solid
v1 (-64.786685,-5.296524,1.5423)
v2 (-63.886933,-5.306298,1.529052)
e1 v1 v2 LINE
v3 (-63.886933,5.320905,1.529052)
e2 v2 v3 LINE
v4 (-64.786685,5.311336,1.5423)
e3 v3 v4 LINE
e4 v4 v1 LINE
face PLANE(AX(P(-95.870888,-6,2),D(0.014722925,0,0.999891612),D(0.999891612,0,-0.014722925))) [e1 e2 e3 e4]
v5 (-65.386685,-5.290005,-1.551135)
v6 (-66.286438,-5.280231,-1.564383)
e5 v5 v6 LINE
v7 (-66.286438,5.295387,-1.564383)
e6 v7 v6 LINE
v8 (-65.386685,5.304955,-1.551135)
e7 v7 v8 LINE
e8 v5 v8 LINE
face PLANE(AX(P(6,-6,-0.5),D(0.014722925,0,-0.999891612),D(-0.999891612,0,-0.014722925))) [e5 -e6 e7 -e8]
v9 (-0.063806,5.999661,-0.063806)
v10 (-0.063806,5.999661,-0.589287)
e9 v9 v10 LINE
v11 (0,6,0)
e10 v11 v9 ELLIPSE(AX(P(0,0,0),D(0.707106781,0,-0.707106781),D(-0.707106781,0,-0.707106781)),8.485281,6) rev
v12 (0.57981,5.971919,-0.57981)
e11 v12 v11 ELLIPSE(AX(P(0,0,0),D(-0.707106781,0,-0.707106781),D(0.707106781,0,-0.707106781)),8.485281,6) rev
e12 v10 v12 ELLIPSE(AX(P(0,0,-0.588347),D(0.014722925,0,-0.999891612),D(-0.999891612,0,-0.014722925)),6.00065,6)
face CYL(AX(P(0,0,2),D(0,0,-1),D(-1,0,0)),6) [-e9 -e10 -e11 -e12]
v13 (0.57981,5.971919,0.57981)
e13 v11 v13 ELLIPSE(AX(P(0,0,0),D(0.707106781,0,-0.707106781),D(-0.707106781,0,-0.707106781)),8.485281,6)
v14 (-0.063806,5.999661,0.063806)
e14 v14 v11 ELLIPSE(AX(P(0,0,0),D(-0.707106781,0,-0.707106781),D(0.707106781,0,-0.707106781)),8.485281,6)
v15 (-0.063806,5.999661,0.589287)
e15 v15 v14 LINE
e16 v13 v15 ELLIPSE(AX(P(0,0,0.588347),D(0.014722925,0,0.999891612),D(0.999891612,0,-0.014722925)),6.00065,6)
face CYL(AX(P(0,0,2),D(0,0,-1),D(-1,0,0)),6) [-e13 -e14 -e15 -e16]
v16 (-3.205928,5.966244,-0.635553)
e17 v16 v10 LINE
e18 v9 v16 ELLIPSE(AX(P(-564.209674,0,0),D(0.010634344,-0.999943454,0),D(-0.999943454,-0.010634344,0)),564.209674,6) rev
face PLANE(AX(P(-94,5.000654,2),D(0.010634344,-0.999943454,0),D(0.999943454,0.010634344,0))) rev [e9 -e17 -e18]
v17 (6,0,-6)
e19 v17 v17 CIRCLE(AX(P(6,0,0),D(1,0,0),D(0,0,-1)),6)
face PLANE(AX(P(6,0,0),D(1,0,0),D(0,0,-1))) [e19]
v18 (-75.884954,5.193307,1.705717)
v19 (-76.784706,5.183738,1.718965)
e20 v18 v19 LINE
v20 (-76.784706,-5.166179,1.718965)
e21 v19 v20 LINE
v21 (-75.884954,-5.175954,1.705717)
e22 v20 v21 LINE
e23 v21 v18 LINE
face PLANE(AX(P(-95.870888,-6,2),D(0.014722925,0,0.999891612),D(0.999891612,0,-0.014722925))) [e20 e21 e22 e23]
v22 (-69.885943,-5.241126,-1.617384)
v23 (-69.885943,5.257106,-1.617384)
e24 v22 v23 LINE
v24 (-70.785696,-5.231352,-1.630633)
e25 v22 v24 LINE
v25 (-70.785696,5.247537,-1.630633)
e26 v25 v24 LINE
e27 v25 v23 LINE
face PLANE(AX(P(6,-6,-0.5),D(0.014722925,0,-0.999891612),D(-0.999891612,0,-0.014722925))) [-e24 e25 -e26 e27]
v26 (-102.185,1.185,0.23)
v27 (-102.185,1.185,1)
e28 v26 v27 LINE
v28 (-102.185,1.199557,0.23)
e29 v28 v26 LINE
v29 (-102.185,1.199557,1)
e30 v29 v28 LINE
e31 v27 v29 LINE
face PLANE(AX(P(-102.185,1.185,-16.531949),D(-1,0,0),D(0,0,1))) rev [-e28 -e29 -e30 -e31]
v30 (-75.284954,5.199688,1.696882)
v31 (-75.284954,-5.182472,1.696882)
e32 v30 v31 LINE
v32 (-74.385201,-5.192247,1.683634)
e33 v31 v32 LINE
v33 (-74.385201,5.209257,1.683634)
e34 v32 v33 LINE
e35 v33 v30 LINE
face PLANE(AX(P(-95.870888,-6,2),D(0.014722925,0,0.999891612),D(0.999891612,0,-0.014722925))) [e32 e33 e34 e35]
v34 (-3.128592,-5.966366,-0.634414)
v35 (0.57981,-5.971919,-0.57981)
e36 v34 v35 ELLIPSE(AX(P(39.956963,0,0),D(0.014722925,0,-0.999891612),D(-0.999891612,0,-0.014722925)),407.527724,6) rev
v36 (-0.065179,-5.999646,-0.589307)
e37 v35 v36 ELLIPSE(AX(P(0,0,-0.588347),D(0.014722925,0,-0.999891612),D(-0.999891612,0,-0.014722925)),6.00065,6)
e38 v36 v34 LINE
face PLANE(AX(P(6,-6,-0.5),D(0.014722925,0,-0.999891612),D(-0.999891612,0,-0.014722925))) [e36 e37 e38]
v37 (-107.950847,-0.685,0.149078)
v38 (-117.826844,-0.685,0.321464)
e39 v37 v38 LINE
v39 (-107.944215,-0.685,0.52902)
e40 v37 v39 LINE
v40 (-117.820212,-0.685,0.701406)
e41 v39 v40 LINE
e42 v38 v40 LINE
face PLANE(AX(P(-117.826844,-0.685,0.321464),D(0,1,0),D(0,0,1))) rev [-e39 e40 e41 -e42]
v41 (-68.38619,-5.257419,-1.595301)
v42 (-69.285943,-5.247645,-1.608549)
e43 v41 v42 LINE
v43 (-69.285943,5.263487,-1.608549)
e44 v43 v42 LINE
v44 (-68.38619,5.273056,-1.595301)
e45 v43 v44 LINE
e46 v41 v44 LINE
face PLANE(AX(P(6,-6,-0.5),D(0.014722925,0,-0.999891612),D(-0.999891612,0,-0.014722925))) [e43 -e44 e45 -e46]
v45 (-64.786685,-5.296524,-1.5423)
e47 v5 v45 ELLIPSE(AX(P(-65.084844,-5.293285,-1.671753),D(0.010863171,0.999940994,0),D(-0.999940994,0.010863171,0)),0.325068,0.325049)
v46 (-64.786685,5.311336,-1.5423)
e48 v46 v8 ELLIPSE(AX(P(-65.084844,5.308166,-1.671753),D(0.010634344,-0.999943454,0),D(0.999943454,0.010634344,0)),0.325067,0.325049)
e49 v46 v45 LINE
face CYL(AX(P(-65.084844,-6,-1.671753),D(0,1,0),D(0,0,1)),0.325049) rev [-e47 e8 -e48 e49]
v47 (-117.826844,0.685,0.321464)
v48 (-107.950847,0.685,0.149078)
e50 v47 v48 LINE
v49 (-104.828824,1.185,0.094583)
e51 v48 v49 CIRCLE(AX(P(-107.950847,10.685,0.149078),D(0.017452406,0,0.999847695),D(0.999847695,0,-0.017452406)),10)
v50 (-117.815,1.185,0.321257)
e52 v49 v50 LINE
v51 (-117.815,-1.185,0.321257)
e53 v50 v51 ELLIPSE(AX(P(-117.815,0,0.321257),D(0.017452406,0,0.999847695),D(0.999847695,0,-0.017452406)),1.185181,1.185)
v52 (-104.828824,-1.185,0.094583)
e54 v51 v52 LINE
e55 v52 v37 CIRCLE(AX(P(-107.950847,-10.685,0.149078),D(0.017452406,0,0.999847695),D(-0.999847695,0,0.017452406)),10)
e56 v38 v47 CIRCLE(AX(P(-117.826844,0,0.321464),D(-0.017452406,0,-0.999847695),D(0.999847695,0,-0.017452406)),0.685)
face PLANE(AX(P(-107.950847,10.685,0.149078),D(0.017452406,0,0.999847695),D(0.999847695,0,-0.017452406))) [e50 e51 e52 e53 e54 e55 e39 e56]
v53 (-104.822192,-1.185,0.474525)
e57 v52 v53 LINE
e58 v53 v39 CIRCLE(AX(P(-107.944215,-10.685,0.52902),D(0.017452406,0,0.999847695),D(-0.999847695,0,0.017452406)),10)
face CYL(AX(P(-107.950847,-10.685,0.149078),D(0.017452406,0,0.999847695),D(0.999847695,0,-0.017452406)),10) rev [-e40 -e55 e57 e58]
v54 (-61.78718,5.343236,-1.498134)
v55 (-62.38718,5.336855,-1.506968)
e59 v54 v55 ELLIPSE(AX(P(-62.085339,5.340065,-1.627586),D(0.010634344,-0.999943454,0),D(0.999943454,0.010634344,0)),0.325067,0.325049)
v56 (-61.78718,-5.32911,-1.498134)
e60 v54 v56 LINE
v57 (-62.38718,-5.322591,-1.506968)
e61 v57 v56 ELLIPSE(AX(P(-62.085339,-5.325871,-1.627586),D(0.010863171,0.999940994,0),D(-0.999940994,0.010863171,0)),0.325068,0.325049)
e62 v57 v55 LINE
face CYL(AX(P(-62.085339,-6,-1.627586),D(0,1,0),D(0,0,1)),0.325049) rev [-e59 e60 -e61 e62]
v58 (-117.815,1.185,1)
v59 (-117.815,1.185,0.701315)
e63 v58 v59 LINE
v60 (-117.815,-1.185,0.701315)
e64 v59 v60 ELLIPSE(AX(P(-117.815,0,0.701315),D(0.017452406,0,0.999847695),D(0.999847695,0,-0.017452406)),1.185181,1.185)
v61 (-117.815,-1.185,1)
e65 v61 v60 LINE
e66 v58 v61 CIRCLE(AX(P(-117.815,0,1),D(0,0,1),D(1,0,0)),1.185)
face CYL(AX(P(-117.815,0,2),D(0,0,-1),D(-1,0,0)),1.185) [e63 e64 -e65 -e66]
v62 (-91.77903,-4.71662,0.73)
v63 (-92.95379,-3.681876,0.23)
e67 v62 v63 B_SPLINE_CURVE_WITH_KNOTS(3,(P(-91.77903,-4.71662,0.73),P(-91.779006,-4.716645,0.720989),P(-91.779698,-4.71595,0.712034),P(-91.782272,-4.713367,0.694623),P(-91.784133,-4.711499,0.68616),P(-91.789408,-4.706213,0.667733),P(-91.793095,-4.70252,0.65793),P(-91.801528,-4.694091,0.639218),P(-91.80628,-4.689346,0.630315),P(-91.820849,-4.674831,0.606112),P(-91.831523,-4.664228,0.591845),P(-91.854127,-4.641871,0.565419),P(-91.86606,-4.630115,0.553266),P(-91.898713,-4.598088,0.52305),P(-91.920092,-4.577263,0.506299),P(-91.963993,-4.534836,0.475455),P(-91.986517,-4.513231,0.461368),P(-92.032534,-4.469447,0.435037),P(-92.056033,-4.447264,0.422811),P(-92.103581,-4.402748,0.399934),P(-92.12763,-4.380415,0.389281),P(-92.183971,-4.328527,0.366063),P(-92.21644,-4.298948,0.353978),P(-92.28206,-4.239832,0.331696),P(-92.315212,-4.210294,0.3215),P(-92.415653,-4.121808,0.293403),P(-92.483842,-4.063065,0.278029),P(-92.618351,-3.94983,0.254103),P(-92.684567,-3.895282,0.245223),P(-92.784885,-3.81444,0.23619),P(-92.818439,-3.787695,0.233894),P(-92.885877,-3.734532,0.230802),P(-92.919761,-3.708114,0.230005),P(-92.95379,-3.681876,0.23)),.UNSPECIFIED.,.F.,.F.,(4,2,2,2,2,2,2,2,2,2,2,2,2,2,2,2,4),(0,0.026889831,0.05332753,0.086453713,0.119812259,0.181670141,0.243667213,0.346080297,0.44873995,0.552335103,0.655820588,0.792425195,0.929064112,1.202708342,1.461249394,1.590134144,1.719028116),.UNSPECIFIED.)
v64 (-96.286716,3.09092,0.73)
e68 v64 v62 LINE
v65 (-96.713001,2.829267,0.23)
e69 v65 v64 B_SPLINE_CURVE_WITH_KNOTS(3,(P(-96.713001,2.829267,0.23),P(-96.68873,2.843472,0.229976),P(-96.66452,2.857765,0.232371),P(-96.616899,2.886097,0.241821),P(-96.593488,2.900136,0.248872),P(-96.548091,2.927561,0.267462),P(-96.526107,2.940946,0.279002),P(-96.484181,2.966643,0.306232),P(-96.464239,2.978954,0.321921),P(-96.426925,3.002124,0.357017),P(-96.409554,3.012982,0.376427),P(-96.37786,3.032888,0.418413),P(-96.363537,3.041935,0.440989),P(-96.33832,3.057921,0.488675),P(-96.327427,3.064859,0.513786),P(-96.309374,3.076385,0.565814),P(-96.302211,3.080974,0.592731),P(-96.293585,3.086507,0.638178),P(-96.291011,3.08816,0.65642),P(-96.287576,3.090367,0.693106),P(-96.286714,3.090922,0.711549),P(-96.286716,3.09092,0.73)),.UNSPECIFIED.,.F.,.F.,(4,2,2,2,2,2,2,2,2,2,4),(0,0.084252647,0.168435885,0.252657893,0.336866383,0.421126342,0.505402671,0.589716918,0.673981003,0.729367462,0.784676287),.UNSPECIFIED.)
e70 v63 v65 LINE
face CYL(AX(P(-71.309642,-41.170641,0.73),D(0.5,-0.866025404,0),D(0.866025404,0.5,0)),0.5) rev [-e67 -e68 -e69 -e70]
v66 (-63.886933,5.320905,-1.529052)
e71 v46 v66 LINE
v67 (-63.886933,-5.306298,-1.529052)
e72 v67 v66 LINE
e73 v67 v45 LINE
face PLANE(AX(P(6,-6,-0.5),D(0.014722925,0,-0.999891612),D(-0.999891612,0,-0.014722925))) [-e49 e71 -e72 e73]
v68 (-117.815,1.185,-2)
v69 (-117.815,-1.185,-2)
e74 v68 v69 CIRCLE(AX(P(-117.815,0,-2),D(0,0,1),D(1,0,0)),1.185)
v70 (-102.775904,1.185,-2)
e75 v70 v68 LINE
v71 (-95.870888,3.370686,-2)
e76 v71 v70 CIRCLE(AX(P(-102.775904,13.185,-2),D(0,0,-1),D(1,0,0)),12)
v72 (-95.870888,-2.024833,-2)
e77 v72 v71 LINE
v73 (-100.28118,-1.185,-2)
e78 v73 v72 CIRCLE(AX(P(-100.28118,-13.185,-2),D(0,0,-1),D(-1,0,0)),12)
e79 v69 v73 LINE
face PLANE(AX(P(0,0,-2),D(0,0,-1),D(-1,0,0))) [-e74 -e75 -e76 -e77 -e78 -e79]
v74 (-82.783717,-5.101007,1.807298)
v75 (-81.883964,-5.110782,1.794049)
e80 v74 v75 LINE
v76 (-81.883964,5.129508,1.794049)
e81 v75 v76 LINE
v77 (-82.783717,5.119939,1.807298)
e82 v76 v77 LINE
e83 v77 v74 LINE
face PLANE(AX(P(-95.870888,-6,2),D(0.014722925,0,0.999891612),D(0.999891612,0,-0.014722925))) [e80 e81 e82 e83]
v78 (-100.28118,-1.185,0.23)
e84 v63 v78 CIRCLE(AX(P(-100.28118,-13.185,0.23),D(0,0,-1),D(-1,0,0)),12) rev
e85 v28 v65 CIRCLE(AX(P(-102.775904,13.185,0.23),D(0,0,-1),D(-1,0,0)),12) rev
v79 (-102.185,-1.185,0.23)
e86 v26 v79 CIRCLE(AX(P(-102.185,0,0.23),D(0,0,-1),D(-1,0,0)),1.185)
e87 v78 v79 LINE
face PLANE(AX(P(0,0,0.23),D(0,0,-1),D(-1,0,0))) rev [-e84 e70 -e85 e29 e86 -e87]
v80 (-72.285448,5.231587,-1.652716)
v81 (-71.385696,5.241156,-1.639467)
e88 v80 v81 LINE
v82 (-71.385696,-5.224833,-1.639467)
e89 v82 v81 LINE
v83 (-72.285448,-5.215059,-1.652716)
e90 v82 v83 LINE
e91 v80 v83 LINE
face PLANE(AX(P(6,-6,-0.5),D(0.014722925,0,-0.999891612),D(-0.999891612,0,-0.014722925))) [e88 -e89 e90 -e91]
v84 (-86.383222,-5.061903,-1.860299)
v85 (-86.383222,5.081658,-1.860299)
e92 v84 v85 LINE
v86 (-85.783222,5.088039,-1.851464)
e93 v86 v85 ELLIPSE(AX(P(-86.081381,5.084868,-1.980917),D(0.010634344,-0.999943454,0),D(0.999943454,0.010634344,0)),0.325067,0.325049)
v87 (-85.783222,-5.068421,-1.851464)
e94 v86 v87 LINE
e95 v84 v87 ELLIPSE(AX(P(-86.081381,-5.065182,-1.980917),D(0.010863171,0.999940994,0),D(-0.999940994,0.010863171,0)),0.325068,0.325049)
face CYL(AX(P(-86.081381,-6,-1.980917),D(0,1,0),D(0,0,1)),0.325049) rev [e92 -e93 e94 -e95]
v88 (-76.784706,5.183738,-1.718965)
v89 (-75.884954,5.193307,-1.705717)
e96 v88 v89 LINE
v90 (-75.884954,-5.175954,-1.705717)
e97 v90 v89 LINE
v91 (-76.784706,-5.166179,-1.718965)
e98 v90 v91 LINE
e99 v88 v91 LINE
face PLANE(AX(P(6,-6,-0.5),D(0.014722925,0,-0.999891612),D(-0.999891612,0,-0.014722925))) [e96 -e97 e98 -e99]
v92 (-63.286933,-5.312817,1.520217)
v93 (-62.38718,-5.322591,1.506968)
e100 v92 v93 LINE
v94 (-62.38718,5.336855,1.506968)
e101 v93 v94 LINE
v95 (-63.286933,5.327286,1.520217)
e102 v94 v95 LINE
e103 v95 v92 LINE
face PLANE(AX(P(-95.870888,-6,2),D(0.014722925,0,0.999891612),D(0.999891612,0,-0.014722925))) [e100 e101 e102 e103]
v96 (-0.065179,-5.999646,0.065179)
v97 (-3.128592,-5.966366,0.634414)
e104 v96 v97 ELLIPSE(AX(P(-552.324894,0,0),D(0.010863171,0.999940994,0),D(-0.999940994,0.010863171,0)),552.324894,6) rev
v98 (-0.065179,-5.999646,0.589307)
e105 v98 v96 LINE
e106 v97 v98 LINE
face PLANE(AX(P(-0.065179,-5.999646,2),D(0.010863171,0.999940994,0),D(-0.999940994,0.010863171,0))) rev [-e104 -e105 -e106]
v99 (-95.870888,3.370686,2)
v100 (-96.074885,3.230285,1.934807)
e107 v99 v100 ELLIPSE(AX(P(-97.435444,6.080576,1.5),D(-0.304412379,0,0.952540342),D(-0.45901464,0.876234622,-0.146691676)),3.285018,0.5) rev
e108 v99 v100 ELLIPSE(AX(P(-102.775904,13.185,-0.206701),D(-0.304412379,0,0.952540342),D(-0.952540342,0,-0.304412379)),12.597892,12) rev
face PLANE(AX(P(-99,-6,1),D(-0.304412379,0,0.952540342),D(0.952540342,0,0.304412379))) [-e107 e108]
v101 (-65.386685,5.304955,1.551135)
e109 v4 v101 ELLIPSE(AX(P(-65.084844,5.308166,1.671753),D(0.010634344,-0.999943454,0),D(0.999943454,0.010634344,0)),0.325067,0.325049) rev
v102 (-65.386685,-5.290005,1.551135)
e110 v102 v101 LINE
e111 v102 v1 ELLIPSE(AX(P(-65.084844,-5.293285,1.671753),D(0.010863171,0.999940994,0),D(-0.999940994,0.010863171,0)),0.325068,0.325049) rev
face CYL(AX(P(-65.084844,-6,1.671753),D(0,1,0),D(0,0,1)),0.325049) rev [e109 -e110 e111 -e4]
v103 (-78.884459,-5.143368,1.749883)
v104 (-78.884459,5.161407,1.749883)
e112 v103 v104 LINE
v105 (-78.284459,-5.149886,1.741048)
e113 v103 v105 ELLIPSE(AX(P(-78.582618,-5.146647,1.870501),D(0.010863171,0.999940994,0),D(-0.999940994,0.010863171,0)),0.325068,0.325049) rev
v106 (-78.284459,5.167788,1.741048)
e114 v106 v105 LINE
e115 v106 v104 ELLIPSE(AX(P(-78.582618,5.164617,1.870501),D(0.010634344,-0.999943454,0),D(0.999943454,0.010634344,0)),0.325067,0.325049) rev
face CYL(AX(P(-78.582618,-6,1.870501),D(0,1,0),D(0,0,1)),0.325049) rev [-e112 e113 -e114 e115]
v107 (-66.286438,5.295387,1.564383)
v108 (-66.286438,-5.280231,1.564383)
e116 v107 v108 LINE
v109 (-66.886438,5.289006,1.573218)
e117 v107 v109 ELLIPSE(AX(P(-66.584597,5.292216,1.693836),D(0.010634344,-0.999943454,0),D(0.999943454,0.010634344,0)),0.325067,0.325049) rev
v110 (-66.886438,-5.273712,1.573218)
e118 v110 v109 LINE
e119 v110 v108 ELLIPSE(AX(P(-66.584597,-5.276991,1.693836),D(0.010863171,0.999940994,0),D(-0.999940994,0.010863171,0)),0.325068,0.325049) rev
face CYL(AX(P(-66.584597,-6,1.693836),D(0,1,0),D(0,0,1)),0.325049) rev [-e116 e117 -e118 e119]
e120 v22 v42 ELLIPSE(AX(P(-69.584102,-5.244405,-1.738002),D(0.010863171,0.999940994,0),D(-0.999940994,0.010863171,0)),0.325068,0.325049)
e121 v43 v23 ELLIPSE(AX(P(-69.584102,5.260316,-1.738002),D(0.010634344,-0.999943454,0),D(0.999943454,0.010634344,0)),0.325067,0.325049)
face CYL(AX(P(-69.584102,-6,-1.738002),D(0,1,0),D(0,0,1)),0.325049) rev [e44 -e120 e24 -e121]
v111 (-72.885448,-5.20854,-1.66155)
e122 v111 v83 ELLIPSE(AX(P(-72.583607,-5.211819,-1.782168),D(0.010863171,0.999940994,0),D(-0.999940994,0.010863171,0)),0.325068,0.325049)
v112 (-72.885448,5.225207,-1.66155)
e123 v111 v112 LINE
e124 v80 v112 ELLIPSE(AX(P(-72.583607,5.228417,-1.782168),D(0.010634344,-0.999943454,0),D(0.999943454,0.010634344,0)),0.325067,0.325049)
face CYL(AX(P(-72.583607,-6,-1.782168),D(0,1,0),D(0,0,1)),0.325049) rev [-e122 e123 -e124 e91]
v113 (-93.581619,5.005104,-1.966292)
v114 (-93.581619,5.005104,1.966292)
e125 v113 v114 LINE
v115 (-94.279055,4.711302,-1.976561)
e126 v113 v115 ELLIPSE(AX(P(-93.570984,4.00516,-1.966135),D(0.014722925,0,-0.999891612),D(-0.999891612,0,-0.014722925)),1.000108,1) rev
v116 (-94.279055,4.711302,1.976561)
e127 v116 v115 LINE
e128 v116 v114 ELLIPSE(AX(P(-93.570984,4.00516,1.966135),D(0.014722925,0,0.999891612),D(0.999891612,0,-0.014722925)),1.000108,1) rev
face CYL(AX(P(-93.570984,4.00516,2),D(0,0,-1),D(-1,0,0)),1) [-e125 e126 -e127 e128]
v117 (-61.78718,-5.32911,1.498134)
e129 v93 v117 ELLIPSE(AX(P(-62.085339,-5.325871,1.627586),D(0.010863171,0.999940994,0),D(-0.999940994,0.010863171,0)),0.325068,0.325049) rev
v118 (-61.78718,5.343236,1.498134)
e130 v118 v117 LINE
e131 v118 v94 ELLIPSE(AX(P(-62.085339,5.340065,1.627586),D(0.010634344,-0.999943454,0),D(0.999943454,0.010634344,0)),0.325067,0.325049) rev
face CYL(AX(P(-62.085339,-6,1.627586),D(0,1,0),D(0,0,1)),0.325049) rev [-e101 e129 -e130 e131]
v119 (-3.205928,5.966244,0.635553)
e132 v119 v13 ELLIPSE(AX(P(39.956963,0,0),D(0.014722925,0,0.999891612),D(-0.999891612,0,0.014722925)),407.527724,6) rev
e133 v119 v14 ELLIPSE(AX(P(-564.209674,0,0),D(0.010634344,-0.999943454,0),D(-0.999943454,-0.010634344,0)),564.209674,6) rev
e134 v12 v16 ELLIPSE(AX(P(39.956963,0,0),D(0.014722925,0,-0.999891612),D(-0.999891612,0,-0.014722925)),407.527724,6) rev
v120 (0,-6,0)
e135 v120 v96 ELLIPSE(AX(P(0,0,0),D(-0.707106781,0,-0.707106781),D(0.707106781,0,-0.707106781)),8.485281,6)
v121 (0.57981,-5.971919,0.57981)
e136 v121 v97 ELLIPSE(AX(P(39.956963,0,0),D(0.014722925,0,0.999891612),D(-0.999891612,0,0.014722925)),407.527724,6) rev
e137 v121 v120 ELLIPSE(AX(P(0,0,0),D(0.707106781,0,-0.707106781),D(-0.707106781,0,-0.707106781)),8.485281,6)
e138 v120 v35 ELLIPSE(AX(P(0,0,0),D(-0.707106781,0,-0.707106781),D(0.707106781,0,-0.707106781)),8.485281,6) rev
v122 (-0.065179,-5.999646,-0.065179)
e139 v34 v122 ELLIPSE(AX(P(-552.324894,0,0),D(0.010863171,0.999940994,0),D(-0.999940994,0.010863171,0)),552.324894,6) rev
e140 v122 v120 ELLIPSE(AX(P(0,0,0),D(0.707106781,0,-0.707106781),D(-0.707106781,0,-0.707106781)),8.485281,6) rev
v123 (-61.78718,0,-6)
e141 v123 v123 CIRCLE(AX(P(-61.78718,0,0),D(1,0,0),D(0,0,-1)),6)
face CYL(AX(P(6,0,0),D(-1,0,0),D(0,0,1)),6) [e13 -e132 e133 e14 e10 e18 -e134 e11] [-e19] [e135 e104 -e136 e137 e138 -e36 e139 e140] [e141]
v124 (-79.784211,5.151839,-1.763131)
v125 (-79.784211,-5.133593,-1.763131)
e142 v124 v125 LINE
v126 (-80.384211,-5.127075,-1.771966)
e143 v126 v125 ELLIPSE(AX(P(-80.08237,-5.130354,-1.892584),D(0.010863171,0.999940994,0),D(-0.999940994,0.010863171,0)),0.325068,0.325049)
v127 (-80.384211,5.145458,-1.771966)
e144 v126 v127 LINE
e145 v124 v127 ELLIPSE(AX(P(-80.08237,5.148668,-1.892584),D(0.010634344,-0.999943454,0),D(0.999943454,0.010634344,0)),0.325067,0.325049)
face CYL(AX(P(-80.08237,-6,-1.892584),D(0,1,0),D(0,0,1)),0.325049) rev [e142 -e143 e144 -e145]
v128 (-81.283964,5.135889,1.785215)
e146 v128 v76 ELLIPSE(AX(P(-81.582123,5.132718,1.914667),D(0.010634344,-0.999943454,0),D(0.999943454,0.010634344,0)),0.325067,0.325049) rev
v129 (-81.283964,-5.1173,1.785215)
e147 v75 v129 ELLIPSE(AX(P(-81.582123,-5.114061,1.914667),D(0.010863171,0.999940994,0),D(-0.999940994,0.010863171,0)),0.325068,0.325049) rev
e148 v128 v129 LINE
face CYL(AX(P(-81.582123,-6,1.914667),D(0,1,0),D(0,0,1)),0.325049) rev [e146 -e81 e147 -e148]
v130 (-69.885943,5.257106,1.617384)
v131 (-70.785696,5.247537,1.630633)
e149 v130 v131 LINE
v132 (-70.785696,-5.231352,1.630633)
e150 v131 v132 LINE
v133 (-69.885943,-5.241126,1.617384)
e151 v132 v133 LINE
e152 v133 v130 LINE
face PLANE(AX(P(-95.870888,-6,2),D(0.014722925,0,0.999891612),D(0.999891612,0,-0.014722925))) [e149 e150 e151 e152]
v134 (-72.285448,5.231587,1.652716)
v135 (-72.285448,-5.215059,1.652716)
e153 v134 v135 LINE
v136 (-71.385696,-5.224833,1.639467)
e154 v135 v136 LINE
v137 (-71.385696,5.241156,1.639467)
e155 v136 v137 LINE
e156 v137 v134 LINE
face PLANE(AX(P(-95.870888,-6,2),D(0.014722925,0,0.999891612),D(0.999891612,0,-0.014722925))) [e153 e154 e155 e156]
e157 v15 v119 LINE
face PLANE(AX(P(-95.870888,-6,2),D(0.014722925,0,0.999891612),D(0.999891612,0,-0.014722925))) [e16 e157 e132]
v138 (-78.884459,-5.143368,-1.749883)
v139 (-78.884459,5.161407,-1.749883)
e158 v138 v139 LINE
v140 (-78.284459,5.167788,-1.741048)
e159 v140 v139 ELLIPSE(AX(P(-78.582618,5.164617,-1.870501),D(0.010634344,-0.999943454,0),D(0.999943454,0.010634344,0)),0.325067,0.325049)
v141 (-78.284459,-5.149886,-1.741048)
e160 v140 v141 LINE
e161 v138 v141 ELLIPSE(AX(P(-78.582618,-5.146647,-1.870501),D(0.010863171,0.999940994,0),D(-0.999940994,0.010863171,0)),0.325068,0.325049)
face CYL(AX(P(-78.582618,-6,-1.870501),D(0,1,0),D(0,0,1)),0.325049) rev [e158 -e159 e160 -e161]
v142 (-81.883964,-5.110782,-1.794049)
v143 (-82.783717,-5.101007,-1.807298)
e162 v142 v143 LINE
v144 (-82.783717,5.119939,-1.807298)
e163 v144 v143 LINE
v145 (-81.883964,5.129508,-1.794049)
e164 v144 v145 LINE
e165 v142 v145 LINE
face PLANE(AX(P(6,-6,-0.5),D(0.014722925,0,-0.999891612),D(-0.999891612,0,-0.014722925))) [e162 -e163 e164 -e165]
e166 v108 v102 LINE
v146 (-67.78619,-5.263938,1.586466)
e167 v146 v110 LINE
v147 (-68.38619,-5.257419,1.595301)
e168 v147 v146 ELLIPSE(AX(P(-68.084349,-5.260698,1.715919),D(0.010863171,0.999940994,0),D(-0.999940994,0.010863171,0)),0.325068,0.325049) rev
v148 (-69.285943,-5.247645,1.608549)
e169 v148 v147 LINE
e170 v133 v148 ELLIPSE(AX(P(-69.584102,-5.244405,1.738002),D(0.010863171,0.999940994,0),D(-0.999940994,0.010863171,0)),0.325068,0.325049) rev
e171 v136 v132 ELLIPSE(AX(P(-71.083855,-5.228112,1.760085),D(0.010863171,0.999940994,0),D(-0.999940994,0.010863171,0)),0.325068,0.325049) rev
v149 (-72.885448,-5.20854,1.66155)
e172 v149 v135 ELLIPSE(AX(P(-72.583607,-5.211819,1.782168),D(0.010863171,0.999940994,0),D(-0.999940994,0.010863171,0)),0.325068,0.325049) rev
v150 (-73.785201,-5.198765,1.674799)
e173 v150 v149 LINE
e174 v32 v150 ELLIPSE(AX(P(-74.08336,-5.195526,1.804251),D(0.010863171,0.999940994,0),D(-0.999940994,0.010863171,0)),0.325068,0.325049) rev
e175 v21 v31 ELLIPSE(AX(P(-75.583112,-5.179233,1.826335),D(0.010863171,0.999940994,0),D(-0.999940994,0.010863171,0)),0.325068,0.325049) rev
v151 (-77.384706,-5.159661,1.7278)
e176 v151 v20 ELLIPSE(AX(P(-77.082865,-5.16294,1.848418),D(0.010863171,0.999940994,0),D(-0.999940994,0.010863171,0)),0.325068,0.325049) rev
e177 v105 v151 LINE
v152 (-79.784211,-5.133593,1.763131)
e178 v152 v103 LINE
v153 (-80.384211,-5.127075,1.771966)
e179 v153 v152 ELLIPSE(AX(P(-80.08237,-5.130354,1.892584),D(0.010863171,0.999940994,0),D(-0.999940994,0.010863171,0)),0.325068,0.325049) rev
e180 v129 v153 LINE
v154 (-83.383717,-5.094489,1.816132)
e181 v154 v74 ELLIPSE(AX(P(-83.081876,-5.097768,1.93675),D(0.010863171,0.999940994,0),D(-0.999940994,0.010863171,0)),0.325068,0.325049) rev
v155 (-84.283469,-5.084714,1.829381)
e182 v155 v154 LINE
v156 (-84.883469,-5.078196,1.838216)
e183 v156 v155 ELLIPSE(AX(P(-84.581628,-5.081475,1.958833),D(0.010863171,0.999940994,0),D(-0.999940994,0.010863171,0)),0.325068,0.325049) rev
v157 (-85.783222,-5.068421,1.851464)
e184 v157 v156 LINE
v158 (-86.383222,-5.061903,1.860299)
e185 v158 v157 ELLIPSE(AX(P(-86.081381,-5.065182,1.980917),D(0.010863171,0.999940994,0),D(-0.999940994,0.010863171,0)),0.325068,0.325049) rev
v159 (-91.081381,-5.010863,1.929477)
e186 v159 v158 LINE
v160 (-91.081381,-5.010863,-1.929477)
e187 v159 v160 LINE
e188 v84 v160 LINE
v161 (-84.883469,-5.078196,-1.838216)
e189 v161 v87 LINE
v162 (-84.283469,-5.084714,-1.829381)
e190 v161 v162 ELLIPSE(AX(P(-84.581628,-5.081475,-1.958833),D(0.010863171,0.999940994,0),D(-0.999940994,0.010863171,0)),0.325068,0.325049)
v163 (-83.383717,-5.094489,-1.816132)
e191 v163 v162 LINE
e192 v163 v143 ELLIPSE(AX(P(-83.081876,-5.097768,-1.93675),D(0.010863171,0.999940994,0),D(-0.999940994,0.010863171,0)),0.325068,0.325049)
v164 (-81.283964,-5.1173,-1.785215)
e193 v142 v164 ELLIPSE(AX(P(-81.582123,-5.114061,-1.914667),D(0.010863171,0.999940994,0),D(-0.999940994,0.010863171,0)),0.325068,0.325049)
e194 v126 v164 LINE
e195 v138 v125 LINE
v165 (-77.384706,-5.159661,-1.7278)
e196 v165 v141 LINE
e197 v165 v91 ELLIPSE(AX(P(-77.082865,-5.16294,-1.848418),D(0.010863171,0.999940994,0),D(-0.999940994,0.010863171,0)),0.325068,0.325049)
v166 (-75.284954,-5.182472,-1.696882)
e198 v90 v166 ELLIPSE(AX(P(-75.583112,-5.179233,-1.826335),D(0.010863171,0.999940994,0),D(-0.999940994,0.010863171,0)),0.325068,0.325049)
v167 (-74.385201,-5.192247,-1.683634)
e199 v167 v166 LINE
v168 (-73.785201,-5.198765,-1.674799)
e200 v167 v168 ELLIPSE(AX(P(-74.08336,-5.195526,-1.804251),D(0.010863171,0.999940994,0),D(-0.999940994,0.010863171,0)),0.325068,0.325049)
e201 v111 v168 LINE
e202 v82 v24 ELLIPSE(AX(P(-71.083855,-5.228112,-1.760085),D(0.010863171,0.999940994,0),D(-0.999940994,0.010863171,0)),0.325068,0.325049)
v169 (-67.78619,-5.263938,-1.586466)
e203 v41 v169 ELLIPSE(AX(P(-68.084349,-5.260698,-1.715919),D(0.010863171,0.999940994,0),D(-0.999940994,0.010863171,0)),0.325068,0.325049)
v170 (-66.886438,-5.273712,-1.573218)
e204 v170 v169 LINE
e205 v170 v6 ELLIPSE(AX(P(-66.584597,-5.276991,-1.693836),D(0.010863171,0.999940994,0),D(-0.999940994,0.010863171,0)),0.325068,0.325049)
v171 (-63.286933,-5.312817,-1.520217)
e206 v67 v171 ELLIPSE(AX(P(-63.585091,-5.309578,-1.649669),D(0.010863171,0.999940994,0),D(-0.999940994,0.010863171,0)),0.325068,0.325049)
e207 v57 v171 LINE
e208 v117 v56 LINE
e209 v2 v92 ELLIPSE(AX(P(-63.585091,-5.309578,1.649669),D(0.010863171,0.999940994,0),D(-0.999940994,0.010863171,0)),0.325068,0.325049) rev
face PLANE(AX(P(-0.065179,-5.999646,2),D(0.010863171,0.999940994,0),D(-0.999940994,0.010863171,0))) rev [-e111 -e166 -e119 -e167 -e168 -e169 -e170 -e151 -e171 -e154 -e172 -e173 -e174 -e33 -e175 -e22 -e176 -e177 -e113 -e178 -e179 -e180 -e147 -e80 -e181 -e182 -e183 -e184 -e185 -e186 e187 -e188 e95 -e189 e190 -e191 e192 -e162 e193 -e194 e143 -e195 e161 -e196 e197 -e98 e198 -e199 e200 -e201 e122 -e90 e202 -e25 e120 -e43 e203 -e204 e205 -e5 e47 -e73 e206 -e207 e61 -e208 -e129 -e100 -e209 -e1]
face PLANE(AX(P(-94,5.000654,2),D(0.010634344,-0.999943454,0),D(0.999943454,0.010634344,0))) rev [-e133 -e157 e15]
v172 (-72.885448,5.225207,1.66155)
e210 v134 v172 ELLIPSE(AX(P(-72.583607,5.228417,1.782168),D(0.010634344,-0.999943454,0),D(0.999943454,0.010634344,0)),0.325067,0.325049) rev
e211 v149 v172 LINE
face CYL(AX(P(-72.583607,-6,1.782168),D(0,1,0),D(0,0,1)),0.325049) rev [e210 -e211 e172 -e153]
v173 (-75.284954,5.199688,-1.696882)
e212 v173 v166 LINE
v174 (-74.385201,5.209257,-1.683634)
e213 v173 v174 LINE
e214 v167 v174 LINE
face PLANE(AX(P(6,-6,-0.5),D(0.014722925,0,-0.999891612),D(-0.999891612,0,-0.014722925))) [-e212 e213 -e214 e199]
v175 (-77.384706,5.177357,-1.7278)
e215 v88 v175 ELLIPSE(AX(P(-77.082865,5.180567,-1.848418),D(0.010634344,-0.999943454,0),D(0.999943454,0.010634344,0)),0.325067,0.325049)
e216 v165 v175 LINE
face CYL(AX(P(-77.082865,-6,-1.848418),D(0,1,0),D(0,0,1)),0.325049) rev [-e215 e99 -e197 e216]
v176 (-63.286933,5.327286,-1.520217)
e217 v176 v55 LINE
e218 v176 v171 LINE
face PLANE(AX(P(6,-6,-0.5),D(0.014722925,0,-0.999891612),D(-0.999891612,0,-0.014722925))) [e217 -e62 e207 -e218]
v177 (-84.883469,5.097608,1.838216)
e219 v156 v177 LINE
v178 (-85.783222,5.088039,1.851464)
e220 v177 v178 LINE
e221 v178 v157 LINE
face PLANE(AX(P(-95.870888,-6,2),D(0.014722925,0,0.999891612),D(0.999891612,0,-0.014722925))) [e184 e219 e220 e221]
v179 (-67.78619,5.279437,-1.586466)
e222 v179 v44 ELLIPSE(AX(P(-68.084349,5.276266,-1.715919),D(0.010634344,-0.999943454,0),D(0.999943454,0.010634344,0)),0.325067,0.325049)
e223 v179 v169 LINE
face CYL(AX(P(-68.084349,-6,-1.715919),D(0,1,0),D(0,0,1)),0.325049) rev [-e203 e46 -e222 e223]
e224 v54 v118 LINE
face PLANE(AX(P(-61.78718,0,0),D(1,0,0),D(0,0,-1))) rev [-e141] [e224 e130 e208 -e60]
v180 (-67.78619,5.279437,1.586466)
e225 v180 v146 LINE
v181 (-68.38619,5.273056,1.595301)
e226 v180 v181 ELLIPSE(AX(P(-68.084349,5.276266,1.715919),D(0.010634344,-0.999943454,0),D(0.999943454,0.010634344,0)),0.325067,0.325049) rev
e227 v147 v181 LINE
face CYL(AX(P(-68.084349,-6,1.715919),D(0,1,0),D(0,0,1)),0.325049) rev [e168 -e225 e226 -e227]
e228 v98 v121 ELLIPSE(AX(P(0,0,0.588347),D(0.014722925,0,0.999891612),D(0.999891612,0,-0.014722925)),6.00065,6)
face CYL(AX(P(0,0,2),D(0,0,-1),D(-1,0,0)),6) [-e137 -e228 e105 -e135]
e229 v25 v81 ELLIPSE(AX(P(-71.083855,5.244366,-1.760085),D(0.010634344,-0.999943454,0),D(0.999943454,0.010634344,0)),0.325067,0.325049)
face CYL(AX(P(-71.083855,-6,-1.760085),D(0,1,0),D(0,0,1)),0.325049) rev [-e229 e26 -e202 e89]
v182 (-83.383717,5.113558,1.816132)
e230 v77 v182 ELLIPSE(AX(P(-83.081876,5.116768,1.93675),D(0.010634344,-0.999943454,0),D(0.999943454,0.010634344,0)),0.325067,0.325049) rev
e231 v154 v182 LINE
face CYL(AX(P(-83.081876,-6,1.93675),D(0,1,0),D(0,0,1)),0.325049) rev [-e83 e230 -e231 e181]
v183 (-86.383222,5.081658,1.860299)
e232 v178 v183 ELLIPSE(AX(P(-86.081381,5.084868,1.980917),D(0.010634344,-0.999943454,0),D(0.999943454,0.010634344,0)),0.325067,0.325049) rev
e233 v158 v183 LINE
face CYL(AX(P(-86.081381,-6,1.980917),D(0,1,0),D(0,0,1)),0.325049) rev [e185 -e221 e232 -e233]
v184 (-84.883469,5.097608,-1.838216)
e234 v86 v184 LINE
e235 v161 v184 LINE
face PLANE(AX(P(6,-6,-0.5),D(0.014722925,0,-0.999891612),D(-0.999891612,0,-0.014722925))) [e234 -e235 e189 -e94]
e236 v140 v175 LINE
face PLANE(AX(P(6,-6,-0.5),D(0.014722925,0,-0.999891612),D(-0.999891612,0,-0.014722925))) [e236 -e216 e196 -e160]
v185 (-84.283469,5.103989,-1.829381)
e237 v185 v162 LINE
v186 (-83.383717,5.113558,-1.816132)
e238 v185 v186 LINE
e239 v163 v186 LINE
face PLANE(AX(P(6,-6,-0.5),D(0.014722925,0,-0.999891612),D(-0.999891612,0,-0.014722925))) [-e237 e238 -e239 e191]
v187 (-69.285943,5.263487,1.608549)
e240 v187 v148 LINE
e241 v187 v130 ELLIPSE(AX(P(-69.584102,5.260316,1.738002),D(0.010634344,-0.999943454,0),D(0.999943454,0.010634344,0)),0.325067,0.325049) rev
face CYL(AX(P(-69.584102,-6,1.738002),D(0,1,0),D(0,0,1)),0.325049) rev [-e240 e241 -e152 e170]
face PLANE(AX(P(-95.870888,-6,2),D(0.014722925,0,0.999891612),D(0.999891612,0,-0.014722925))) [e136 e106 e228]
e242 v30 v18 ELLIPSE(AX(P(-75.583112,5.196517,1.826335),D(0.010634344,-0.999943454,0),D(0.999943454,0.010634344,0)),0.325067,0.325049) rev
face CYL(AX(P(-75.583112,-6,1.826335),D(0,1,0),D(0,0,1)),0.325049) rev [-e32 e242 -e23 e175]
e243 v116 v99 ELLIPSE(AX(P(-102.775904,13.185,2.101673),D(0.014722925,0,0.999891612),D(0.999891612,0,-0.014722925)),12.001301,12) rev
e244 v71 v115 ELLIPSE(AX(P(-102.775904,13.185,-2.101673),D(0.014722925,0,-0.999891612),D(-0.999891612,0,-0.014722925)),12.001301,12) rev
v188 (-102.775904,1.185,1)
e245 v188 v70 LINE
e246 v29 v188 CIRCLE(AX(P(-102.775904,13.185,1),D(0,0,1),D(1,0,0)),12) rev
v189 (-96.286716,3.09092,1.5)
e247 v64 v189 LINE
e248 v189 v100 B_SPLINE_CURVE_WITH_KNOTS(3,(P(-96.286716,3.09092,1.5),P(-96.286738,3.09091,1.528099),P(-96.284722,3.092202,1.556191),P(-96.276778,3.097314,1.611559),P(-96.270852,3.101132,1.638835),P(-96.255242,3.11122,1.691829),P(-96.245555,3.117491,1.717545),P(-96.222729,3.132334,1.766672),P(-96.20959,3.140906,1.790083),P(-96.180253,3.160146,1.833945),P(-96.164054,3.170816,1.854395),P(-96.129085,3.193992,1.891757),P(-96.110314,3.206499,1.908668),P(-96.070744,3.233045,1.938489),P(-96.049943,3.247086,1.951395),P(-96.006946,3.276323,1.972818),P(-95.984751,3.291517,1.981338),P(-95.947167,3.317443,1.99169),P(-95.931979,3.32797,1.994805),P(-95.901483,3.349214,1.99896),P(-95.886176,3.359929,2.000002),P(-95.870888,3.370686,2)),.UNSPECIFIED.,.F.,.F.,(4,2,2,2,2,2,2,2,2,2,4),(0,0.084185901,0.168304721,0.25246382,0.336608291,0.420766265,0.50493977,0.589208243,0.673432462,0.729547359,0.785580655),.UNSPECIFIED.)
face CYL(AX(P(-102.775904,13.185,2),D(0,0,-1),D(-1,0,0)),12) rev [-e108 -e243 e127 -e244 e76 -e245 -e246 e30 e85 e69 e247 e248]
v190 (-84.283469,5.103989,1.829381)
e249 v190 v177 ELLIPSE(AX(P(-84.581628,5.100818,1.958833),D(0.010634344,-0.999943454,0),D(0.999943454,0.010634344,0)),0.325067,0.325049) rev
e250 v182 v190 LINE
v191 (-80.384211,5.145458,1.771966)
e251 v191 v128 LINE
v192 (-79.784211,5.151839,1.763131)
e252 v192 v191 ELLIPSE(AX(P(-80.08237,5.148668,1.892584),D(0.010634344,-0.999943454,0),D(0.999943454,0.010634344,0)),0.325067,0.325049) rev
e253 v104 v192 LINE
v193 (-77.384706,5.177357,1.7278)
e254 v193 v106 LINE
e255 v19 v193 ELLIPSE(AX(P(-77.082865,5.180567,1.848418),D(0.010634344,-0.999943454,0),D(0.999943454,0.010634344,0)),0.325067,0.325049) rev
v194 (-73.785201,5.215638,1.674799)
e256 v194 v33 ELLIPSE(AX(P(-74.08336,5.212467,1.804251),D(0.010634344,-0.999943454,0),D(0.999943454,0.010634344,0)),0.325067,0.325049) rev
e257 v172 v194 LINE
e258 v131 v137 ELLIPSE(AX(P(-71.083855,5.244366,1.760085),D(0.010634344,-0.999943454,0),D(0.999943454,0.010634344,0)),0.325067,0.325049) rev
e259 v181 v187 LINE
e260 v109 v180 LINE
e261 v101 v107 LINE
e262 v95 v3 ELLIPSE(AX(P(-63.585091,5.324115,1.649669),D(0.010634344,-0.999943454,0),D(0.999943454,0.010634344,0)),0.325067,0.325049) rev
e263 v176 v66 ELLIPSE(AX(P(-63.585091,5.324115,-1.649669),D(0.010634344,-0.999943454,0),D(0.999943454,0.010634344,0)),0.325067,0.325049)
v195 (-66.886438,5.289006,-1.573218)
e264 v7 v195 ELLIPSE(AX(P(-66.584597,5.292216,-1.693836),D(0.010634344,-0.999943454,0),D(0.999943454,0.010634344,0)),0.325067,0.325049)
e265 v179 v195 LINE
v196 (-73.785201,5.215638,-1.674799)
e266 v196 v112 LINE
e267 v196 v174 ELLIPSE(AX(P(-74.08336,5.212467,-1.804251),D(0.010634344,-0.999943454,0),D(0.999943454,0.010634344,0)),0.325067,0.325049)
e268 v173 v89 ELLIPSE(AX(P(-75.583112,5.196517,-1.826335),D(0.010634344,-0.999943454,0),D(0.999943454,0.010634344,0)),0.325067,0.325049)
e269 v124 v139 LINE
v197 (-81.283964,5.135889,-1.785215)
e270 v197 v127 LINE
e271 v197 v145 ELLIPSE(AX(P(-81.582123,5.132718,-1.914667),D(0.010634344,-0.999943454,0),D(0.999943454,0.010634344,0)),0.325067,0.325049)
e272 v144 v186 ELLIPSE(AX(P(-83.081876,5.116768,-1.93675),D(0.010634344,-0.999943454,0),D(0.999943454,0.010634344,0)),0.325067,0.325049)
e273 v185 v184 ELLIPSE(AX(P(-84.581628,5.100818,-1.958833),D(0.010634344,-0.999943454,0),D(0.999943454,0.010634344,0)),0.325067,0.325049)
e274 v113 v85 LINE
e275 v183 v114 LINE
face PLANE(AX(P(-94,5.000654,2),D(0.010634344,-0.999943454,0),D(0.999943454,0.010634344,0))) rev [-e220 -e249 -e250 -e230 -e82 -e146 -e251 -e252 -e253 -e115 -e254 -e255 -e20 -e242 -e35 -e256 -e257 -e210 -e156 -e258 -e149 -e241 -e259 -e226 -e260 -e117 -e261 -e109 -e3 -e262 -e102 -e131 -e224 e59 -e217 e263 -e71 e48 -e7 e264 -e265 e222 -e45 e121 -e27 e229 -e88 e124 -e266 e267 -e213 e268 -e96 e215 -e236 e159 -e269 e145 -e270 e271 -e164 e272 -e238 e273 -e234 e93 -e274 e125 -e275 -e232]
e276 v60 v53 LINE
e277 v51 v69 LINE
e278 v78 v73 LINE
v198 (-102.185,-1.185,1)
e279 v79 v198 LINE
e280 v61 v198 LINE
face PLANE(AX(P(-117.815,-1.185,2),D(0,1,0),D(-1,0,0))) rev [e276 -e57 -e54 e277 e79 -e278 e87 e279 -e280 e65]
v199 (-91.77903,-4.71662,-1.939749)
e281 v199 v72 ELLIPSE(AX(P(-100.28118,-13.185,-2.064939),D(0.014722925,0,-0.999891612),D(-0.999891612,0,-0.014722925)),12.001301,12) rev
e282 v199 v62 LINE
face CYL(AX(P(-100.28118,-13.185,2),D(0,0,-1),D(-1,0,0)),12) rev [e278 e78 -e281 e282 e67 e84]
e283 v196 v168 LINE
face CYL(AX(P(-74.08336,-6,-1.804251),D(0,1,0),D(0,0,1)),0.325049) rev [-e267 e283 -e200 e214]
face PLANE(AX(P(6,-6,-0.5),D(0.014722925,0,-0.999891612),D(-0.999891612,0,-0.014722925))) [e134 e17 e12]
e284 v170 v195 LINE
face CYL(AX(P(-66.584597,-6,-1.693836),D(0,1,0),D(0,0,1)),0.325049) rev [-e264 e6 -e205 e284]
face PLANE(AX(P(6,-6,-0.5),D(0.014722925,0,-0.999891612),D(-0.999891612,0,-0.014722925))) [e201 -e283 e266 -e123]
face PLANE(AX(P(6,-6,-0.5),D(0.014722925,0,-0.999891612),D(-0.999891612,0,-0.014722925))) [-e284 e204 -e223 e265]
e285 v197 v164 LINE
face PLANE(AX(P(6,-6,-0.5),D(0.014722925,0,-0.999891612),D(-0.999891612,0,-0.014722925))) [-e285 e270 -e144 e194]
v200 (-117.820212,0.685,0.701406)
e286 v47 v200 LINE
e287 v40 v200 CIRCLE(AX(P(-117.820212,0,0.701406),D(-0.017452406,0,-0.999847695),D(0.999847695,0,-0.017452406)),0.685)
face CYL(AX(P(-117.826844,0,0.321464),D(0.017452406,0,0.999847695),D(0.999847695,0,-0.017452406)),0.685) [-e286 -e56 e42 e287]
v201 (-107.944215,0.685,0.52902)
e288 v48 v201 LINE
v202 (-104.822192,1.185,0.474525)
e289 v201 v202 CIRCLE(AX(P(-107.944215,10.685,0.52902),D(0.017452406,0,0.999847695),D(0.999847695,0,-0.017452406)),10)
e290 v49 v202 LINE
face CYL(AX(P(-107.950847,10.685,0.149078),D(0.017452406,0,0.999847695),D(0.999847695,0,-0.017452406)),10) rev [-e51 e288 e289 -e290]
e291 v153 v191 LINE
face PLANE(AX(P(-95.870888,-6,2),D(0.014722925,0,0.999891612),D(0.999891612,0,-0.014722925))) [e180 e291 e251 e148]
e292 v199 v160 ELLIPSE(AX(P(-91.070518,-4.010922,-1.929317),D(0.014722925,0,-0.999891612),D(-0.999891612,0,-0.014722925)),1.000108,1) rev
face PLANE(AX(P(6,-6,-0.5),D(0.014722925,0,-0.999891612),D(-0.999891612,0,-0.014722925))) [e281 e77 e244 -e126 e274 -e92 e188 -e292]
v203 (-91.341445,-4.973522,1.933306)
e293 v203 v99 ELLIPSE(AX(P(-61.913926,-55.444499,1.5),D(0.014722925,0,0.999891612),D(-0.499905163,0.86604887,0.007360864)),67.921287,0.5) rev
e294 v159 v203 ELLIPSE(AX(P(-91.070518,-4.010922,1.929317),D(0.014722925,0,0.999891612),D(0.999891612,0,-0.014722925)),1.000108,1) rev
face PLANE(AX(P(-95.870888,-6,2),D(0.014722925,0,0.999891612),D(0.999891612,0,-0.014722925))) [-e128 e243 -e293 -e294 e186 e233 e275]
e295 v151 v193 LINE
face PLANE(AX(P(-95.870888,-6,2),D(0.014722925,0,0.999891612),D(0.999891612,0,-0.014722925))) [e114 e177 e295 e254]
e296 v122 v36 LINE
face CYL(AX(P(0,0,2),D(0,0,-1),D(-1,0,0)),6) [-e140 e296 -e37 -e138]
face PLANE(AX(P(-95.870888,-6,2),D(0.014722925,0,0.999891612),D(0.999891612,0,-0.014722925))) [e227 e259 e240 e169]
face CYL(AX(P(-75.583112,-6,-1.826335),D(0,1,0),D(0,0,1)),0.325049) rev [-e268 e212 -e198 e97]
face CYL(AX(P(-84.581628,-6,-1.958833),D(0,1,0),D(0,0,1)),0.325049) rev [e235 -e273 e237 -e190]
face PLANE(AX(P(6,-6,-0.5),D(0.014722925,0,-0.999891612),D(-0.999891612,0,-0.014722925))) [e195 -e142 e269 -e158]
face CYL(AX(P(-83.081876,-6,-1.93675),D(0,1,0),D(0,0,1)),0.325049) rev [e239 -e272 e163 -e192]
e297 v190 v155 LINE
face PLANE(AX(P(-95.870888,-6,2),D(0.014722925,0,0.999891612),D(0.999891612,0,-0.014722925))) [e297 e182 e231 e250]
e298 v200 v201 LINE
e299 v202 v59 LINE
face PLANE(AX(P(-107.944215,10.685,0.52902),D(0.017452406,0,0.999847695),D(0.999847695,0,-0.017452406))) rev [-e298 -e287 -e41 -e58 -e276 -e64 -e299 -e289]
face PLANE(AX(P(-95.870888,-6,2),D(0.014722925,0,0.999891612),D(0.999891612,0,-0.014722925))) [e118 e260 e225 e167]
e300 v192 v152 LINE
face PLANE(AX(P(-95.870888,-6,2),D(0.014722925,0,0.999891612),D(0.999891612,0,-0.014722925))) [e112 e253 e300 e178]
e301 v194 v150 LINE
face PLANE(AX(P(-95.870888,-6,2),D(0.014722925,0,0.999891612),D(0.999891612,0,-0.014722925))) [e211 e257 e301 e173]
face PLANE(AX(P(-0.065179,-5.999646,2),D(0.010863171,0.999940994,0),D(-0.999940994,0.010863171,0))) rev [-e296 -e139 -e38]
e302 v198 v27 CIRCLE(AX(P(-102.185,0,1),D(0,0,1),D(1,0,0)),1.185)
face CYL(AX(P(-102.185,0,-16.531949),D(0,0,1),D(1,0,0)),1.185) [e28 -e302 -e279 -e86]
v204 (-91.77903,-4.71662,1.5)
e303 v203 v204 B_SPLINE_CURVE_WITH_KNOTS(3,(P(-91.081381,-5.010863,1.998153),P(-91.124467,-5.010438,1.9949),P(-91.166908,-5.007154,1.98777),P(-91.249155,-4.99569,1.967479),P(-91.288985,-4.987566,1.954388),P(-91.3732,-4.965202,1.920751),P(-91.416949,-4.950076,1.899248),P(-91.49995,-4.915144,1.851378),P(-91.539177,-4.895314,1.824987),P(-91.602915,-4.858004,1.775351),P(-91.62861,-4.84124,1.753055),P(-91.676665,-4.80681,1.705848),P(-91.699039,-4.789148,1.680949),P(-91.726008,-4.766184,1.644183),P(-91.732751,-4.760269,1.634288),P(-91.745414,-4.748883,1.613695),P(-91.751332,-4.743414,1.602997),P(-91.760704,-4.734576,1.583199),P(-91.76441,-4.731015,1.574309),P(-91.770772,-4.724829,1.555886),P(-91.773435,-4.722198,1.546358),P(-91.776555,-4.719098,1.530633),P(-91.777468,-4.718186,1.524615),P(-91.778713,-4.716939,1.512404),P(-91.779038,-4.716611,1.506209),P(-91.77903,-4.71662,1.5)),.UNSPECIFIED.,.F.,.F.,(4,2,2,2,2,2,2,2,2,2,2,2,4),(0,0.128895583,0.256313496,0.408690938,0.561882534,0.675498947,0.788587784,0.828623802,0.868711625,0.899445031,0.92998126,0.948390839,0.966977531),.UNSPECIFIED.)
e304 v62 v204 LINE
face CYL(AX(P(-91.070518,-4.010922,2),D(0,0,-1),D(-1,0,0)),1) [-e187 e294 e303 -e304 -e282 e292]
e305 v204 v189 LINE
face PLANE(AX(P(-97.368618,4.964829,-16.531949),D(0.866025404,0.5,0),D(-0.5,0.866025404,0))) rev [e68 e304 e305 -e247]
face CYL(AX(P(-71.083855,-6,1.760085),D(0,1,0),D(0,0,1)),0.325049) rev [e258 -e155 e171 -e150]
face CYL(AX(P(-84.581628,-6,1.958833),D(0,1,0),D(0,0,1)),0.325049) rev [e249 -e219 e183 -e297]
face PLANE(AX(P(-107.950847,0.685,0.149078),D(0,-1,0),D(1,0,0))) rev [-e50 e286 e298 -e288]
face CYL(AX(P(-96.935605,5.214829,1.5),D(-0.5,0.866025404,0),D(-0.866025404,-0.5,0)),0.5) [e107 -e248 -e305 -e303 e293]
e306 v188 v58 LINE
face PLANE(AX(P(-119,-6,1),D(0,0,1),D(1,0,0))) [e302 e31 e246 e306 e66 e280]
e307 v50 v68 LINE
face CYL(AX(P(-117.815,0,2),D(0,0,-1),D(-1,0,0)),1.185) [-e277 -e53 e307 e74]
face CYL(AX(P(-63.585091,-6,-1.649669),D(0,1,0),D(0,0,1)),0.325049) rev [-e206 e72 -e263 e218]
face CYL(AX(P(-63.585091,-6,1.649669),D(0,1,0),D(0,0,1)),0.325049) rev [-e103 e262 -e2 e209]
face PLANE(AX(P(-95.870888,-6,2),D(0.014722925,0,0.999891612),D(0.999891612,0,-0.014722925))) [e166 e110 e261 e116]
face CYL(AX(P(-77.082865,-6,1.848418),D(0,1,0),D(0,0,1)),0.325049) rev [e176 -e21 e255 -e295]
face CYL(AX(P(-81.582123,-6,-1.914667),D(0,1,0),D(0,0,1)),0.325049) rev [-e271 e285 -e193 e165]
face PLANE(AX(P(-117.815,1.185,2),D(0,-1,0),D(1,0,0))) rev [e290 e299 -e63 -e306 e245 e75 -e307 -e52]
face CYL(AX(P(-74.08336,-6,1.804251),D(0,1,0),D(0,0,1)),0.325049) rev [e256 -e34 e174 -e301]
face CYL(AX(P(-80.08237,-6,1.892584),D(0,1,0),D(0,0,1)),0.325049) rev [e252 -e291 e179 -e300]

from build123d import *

# Parameters (mm, degrees)
BOSS_EXTRU_1_DEPTH           = 2
CONG_2_R                     = 1
ENL_V_MAT_EXTRU_1_DEPTH      = 1.77
CONG_1_R                     = 0.5
ENL_V_MAT_EXTRU_2_DEPTH      = 120.16794871273063
ENL_V_MAT_EXTRU_2_DEPTH_BACK = 120.16794871273063
ESQUISSE4_OUTSIDE_W          = 152.128
ESQUISSE4_OUTSIDE_H          = 31.128000000000004
ENL_V_MAT_EXTRU_3_DEPTH      = 120.16794871273063
R_P_TITION_START             = -5.329109723
R_P_TITION_LIN_AIRE1_DEPTH   = 10.672345711
ENL_V_MAT_EXTRU_5_DEPTH      = 0.19
BOSS_EXTRU_2_DEPTH           = 6
BOSS_EXTRU_2_DEPTH_BACK      = 61.78718
ESQUISSE9_R                  = 6


# Read off the part's stored shape, not the designer's step: Répétition linéaire1
with BuildPart() as part:
    # Esquisse1 → Boss.-Extru.1 (new, symmetric)
    with BuildSketch(Plane.XY):
        with BuildLine():
            Line((-94, 5.000654392557492), (-0.06380606653039397, 5.999660722563728))
            ThreePointArc((-0.06380606653039397, 5.999660722563728), (5.999999960724106, -0.0006865206484478), (-0.06517902850728707, -5.9996459640751185))
            Line((-0.06517902850728707, -5.9996459640751185), (-91.5, -5.0063152178369394))
            ThreePointArc((-91.5, -5.0063152178369394), (-95.49287183308192, -2.181722820314924), (-100.28117960378982, -1.1850000000000003))
            Line((-100.28117960378982, -1.1850000000000003), (-117.815, -1.185))
            ThreePointArc((-117.815, -1.185), (-119, 1.5e-16), (-117.815, 1.185))
            Line((-117.815, 1.185), (-102.77590376986532, 1.1850000000000003))
            ThreePointArc((-102.77590376986532, 1.1850000000000003), (-97.99114396864803, 2.1801795269229824), (-94, 5.000654392557492))
        make_face()
    extrude(amount=BOSS_EXTRU_1_DEPTH, both=True)

    # Congé2
    cong_2_edges = [part.edges().sort_by_distance(p)[0] for p in [
        (-91.5, -5.006315217836939, 0),
        (-94, 5.000654392557493, 0),
    ]]
    fillet(cong_2_edges, radius=CONG_2_R)

    # Esquisse3 → Enlèv. mat.-Extru.1 (cut)
    with BuildSketch(Plane.XY.offset(2)):
        with BuildLine():
            Line((-97.36861768988254, 4.964829326045353), (-91.6124802044987, -5.005093253991168))
            Line((-91.6124802044987, -5.005093253991168), (-102.18500000000003, -5.00509325399117))
            Line((-102.18500000000003, -5.00509325399117), (-102.18500000000003, -1.185))
            ThreePointArc((-102.18500000000003, -1.185), (-101.00000000000003, 0), (-102.18500000000003, 1.185))
            Line((-102.18500000000003, 1.185), (-102.18500000000003, 4.964829326045353))
            Line((-102.18500000000003, 4.964829326045353), (-97.36861768988254, 4.964829326045353))
        make_face()
    extrude(amount=-ENL_V_MAT_EXTRU_1_DEPTH, mode=Mode.SUBTRACT)

    # Congé1
    cong_1_edges = [part.edges().sort_by_distance(p)[0] for p in [
        (-94.03287302320349, -0.8128499177196291, 0.22999999999999998),
        (-94.03287302320348, -0.8128499177196522, 2),
    ]]
    fillet(cong_1_edges, radius=CONG_1_R)

    # Esquisse4 outside → Enlèv. mat.-Extru.2 (cut, two sides: drawn at the far end of the back side and taken through both)
    with BuildSketch(Plane(origin=(0, 0, 0), x_dir=(1, 0, 0), z_dir=(0, 1, 0)).offset(-ENL_V_MAT_EXTRU_2_DEPTH_BACK)):
        with Locations((-56.5, 0)):
            Rectangle(ESQUISSE4_OUTSIDE_W, ESQUISSE4_OUTSIDE_H)
        Polygon((-119.00000000000001, -1.000000000000003), (-99, -1.000000000000003), (-95.8708882867572, -2), (6, -0.5), (6, 0.5), (-95.8708882867572, 2), (-119.00000000000001, 2), align=None, mode=Mode.SUBTRACT)
    extrude(amount=ENL_V_MAT_EXTRU_2_DEPTH + ENL_V_MAT_EXTRU_2_DEPTH_BACK, mode=Mode.SUBTRACT)

    # Esquisse5 → Enlèv. mat.-Extru.3 (cut, symmetric)
    with BuildSketch(Plane(origin=(0, 0, 0), x_dir=(1, 0, 0), z_dir=(0, 1, 0))):
        with BuildLine():
            Line((-86.38322192363898, 1.8602986605494507), (-85.78322192363899, 1.8514639481489208))
            ThreePointArc((-85.78322192363899, 1.8514639481489208), (-86.08616650857984, 1.6559029819751625), (-86.38322192363898, 1.8602986605494507))
        make_face()
    enl_v_mat_extru_3 = extrude(amount=ENL_V_MAT_EXTRU_3_DEPTH, both=True, mode=Mode.SUBTRACT)

    # Répétition linéaire1 outline → Répétition linéaire1 (cut)
    with BuildSketch(Plane(origin=(0, 0, 0), x_dir=(1, 0, 0), z_dir=(0, 1, 0)).offset(R_P_TITION_START)):
        with BuildLine():
            Line((-84.283469298, 1.82938081), (-84.883469298, 1.838215522))
            ThreePointArc((-84.883469298, 1.838215522), (-84.586413883, 1.633819843), (-84.283469298, 1.82938081))
        make_face()
        with BuildLine():
            Line((-61.787179907, 1.498133732), (-62.387179907, 1.506968444))
            ThreePointArc((-62.387179907, 1.506968444), (-62.090124492, 1.302572765), (-61.787179907, 1.498133732))
        make_face()
        with BuildLine():
            Line((-63.286932533, 1.52021687), (-63.886932533, 1.529051582))
            ThreePointArc((-63.886932533, 1.529051582), (-63.589877118, 1.324655904), (-63.286932533, 1.52021687))
        make_face()
        with BuildLine():
            Line((-64.786685159, 1.542300009), (-65.386685159, 1.551134721))
            ThreePointArc((-65.386685159, 1.551134721), (-65.089629744, 1.346739042), (-64.786685159, 1.542300009))
        make_face()
        with BuildLine():
            Line((-66.286437785, 1.564383147), (-66.886437785, 1.57321786))
            ThreePointArc((-66.886437785, 1.57321786), (-66.58938237, 1.368822181), (-66.286437785, 1.564383147))
        make_face()
        with BuildLine():
            Line((-67.786190411, 1.586466286), (-68.386190411, 1.595300998))
            ThreePointArc((-68.386190411, 1.595300998), (-68.089134996, 1.39090532), (-67.786190411, 1.586466286))
        make_face()
        with BuildLine():
            Line((-69.285943037, 1.608549424), (-69.885943037, 1.617384137))
            ThreePointArc((-69.885943037, 1.617384137), (-69.588887622, 1.412988458), (-69.285943037, 1.608549424))
        make_face()
        with BuildLine():
            Line((-70.785695663, 1.630632563), (-71.385695663, 1.639467275))
            ThreePointArc((-71.385695663, 1.639467275), (-71.088640248, 1.435071597), (-70.785695663, 1.630632563))
        make_face()
        with BuildLine():
            Line((-72.285448289, 1.652715701), (-72.885448289, 1.661550414))
            ThreePointArc((-72.885448289, 1.661550414), (-72.588392874, 1.457154735), (-72.285448289, 1.652715701))
        make_face()
        with BuildLine():
            Line((-73.785200915, 1.67479884), (-74.385200915, 1.683633552))
            ThreePointArc((-74.385200915, 1.683633552), (-74.0881455, 1.479237874), (-73.785200915, 1.67479884))
        make_face()
        with BuildLine():
            Line((-75.284953541, 1.696881978), (-75.884953541, 1.705716691))
            ThreePointArc((-75.884953541, 1.705716691), (-75.587898126, 1.501321012), (-75.284953541, 1.696881978))
        make_face()
        with BuildLine():
            Line((-76.784706168, 1.718965117), (-77.384706168, 1.727799829))
            ThreePointArc((-77.384706168, 1.727799829), (-77.087650753, 1.523404151), (-76.784706168, 1.718965117))
        make_face()
        with BuildLine():
            Line((-78.284458794, 1.741048255), (-78.884458794, 1.749882968))
            ThreePointArc((-78.884458794, 1.749882968), (-78.587403379, 1.545487289), (-78.284458794, 1.741048255))
        make_face()
        with BuildLine():
            Line((-79.78421142, 1.763131394), (-80.38421142, 1.771966106))
            ThreePointArc((-80.38421142, 1.771966106), (-80.087156005, 1.567570428), (-79.78421142, 1.763131394))
        make_face()
        with BuildLine():
            Line((-81.283964046, 1.785214533), (-81.883964046, 1.794049245))
            ThreePointArc((-81.883964046, 1.794049245), (-81.586908631, 1.589653566), (-81.283964046, 1.785214533))
        make_face()
        with BuildLine():
            Line((-82.783716672, 1.807297671), (-83.383716672, 1.816132383))
            ThreePointArc((-83.383716672, 1.816132383), (-83.086661257, 1.611736705), (-82.783716672, 1.807297671))
        make_face()
    r_p_tition_lin_aire1 = extrude(amount=R_P_TITION_LIN_AIRE1_DEPTH, mode=Mode.SUBTRACT)

    # Symétrie1: Enlèv. mat.-Extru.3, Répétition linéaire1 across plane
    add(enl_v_mat_extru_3.mirror(Plane.XY), mode=Mode.SUBTRACT)
    add(r_p_tition_lin_aire1.mirror(Plane.XY), mode=Mode.SUBTRACT)

    # Esquisse8 → Enlèv. mat.-Extru.5 (cut, symmetric)
    with BuildSketch(Plane(origin=(-0.02696303982545021, 0, -1.5447115170486774), x_dir=(0.9998476951563913, 0, -0.01745240643728355), z_dir=(0.01745240643728355, 0, 0.9998476951563913))):
        with BuildLine():
            Line((-117.81450861128754, -0.6849999999999998), (-107.93700761048673, -0.6849999999999998))
            ThreePointArc((-107.93700761048673, -0.6849999999999998), (-106.35586878040255, -0.8107911709342499), (-104.81450861128754, -1.1849999999999998))
            Line((-104.81450861128754, -1.1849999999999998), (-104.81450861128754, -1.6849999999999998))
            Line((-104.81450861128754, -1.6849999999999998), (-117.81450861128754, -1.6849999999999998))
            ThreePointArc((-117.81450861128754, -1.6849999999999998), (-119.49950861128754, 2.1e-16), (-117.81450861128754, 1.685))
            Line((-117.81450861128754, 1.685), (-104.81450861128754, 1.6850000000000016))
            Line((-104.81450861128754, 1.6850000000000016), (-104.81450861128754, 1.185))
            ThreePointArc((-104.81450861128754, 1.185), (-106.35586878040255, 0.8107911709342517), (-107.93700761048673, 0.6850000000000016))
            Line((-107.93700761048673, 0.6850000000000016), (-117.81450861128754, 0.6849999999999999))
            ThreePointArc((-117.81450861128754, 0.6849999999999999), (-118.49950861128754, 8e-17), (-117.81450861128754, -0.6849999999999998))
        make_face()
    extrude(amount=ENL_V_MAT_EXTRU_5_DEPTH, both=True, mode=Mode.SUBTRACT)

    # Esquisse9 → Boss.-Extru.2 (add, two sides: drawn at the far end of the back side and taken through both)
    with BuildSketch(Plane(origin=(0, 0, 0), x_dir=(0, 0, -1), z_dir=(1, 0, 0)).offset(-BOSS_EXTRU_2_DEPTH_BACK)):
        Circle(ESQUISSE9_R)
    extrude(amount=BOSS_EXTRU_2_DEPTH + BOSS_EXTRU_2_DEPTH_BACK)


solid = part.part
